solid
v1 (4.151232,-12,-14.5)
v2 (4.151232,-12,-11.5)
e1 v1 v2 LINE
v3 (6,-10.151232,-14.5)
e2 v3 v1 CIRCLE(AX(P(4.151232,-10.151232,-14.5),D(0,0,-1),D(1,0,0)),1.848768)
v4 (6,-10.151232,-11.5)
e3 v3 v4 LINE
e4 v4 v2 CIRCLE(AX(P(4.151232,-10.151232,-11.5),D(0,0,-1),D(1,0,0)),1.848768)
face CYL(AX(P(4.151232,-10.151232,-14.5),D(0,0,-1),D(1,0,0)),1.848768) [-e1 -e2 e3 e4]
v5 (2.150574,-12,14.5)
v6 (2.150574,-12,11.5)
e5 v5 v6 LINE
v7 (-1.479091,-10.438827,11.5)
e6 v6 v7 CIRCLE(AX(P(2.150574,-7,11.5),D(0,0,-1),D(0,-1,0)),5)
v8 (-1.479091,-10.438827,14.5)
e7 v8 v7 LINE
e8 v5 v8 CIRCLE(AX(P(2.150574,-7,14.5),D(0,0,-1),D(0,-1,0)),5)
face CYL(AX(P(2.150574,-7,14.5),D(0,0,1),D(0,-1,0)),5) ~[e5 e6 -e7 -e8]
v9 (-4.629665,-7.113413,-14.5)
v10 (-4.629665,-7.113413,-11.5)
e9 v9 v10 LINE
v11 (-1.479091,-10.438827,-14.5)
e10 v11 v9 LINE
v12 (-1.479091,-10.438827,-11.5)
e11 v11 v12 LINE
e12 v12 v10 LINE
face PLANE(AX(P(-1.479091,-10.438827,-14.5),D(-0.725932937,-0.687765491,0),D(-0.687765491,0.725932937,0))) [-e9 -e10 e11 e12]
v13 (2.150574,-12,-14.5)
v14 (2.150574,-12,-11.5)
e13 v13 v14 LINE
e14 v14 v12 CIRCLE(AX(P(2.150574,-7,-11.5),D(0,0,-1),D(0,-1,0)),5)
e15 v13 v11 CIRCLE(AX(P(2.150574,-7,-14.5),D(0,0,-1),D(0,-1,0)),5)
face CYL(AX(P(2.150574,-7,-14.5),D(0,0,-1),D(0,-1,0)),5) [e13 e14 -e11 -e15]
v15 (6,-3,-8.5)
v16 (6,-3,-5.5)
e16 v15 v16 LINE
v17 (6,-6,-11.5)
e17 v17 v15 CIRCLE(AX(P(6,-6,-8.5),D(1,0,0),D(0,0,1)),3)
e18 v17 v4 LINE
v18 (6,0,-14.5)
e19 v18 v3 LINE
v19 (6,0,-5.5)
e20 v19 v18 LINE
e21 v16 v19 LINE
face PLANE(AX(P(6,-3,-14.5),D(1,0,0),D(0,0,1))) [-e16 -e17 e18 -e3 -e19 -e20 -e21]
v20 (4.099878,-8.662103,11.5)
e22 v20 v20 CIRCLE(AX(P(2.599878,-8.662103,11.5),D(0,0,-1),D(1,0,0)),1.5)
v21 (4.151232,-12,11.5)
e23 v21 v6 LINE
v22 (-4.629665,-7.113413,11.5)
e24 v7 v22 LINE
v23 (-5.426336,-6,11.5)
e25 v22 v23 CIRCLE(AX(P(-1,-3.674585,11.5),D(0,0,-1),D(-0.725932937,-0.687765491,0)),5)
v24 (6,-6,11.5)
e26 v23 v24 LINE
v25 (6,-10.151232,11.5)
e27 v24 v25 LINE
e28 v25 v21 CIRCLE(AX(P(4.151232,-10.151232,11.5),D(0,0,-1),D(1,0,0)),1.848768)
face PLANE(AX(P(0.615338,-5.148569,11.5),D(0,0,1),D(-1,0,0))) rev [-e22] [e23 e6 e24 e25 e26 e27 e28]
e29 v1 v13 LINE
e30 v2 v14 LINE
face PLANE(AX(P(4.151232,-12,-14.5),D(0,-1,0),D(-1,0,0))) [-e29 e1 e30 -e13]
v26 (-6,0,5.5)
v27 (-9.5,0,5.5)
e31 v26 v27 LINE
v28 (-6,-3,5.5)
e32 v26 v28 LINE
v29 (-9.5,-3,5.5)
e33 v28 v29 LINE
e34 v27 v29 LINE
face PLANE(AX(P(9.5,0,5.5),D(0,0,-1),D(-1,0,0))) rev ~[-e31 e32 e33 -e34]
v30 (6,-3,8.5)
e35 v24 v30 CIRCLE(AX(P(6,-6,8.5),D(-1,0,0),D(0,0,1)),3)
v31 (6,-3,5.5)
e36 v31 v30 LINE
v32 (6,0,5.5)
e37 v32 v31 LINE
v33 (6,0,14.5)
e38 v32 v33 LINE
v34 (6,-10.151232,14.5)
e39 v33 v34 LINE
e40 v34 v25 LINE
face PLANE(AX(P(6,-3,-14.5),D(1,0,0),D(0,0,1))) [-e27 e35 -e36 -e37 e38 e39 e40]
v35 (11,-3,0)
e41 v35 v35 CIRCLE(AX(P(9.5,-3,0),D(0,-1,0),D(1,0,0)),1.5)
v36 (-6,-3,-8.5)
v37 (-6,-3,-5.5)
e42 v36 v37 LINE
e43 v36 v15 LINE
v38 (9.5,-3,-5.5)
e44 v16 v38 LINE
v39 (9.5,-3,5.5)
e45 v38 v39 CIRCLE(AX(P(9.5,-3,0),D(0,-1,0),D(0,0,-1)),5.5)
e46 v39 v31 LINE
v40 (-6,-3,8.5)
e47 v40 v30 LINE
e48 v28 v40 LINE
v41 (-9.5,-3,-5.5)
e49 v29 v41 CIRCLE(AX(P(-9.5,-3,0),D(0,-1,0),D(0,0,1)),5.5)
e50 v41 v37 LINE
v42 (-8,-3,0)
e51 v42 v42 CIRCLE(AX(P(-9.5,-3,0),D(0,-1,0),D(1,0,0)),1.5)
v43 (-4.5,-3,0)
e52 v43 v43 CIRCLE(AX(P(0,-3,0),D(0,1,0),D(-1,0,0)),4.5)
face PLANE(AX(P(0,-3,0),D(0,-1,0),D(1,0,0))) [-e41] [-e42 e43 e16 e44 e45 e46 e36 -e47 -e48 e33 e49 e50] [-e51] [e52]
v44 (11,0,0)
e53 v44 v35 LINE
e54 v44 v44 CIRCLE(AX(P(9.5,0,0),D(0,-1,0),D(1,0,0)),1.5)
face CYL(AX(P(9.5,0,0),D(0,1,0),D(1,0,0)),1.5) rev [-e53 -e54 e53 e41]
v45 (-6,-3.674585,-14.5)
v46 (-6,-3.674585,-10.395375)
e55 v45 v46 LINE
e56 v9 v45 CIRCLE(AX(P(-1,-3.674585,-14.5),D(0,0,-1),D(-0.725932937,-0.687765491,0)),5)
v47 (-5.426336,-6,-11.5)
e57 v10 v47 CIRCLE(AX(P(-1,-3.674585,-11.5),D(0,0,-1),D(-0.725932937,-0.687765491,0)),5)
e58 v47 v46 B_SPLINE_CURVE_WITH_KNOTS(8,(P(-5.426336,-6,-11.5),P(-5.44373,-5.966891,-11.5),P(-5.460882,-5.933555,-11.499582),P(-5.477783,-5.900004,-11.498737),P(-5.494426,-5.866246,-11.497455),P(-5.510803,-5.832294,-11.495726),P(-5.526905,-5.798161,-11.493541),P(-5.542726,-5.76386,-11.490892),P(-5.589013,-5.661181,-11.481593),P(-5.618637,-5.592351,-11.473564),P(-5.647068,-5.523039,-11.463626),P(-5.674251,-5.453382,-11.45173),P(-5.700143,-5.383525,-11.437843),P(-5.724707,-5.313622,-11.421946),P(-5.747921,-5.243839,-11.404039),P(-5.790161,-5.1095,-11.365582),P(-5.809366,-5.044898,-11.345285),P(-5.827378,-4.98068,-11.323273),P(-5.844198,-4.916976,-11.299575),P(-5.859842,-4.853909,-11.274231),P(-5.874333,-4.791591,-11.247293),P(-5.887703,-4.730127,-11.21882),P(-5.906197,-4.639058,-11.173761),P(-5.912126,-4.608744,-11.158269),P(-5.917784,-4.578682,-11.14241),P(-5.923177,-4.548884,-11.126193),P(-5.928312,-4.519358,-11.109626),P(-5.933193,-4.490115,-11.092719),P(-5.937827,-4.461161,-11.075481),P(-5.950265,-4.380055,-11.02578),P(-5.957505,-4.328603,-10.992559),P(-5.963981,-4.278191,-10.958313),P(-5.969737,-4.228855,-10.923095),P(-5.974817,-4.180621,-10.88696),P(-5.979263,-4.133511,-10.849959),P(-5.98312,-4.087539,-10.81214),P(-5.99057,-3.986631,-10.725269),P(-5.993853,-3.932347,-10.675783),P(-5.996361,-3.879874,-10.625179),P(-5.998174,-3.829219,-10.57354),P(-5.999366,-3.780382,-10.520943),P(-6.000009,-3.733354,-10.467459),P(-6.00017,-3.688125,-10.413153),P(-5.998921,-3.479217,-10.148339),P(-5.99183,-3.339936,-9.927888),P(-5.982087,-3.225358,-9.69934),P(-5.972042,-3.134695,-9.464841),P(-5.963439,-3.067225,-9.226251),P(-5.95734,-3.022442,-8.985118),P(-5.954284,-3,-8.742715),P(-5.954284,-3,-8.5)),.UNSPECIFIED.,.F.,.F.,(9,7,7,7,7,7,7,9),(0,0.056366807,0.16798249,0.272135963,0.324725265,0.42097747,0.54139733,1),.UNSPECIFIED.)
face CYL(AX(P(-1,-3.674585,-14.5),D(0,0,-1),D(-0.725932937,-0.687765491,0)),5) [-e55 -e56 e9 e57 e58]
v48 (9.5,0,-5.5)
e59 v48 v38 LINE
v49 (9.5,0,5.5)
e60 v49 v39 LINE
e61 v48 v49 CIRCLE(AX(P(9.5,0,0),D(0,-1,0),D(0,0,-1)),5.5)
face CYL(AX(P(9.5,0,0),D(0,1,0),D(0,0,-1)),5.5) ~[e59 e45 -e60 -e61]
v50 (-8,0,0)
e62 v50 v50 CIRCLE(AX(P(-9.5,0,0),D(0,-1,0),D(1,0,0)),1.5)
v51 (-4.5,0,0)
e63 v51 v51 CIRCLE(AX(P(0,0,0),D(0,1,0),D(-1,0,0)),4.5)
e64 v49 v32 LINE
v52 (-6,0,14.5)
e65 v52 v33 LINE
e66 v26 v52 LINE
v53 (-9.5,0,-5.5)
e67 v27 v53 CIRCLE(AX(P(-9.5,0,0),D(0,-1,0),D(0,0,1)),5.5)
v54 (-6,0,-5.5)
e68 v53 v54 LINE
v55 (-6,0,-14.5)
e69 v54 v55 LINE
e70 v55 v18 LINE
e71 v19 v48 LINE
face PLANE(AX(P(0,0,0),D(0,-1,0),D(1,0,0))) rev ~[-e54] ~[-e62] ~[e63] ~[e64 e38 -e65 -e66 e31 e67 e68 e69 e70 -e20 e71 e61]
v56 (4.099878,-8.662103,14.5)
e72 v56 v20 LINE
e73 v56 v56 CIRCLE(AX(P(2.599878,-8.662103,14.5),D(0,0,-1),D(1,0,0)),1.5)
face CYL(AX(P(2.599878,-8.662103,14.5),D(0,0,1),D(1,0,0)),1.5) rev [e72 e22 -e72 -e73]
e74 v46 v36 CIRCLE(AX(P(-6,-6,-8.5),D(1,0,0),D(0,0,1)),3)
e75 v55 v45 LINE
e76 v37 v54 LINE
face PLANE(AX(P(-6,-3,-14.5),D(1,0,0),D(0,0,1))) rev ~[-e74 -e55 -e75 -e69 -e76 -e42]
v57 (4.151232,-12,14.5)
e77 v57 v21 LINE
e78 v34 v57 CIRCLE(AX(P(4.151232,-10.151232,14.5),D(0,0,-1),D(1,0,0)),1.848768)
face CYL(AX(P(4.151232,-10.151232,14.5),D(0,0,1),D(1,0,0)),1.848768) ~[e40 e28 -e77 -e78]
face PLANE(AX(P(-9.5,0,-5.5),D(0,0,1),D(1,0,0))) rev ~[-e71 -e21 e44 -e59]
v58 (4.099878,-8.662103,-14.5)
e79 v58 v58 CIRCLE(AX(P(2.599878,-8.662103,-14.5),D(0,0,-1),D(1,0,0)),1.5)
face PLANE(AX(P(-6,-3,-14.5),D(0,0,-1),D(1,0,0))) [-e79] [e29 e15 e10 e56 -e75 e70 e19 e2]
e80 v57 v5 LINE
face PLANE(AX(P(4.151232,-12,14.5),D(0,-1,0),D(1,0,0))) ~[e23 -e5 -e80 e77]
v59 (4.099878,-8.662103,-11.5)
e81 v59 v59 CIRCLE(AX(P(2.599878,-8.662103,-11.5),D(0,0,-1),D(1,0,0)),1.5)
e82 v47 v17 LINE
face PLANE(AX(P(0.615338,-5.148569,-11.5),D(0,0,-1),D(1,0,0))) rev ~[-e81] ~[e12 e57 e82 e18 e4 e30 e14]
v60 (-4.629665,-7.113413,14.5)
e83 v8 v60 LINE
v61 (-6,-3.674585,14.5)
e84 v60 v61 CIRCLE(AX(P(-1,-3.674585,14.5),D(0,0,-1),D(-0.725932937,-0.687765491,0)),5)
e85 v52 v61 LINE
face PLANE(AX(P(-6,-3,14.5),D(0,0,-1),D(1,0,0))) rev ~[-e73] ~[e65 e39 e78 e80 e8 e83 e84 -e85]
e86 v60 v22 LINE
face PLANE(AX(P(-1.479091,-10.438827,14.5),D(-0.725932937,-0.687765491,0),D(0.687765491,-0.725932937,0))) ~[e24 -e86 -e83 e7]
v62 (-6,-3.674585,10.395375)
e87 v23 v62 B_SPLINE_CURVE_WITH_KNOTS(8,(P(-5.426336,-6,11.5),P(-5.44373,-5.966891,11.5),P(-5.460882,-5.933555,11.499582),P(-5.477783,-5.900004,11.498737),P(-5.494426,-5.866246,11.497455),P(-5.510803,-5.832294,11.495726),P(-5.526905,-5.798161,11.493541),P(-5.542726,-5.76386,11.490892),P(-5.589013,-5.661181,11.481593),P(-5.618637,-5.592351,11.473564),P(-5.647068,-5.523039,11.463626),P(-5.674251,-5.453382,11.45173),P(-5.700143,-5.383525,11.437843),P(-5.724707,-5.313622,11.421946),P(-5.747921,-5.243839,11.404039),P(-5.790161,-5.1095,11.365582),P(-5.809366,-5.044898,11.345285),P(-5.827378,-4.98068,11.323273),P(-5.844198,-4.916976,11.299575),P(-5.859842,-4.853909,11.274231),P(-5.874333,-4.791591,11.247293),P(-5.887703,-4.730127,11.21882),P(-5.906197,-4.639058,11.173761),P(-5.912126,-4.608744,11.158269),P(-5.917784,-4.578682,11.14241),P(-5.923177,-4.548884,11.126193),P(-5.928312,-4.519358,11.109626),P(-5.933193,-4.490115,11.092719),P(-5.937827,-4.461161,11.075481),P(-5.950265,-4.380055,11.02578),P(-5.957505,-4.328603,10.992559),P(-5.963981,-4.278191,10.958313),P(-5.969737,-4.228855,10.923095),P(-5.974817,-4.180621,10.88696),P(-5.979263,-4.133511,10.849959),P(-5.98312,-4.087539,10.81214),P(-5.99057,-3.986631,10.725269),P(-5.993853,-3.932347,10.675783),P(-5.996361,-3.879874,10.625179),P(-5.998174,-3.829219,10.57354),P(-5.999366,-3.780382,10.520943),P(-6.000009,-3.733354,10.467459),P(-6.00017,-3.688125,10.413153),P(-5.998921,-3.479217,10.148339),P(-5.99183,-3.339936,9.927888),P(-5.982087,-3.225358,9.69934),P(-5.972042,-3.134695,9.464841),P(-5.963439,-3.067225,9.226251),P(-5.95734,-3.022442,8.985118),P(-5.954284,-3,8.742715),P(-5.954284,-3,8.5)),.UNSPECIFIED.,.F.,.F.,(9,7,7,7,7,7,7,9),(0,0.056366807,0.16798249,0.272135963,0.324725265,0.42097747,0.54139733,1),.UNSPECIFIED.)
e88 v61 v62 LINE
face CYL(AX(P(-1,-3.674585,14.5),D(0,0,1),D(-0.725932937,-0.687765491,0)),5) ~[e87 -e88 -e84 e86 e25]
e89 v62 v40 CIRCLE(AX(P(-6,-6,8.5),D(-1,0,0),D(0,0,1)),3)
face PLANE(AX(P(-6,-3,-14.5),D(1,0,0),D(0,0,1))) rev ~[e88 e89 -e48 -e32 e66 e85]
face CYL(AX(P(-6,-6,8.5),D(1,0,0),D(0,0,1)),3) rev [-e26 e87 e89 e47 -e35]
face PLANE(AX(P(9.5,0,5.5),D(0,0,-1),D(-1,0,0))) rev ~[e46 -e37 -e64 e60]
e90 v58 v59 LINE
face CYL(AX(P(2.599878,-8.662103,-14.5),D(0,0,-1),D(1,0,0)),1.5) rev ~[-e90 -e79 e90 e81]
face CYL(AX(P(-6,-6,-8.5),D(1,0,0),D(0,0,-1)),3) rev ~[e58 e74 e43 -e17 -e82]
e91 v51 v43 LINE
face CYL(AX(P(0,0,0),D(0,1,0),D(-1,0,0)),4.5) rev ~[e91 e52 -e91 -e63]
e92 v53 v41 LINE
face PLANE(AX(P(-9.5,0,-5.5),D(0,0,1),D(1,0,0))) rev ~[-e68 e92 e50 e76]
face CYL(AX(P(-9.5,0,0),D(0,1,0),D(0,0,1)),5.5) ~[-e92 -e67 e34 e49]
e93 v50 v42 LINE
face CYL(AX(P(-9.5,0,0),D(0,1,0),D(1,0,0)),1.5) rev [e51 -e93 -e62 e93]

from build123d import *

# Parameters (mm, degrees)
F0_R     = 1.5
F0_R_2   = 4.5
F1_DEPTH = 3
F2_W     = 12
F2_H     = 29
F3_DEPTH = 3
F4_R     = 1.5
F5_DEPTH = 3
F7_R     = 3
F8_R     = 4.5
F9_DEPTH = 3


with BuildPart() as f1:
    # F0 (on Front) → F1 (new body)
    with BuildSketch(Plane.XZ):
        with BuildLine():
            Line((0, -5.5), (9.5, -5.5))
            ThreePointArc((9.5, -5.5), (15, 0), (9.5, 5.5))
            Line((9.5, 5.5), (0, 5.5))
            Line((0, 5.5), (-9.5, 5.5))
            ThreePointArc((-9.5, 5.5), (-15, 0), (-9.5, -5.5))
            Line((-9.5, -5.5), (0, -5.5))
        make_face()
        with Locations((-9.5, 0)):
            Circle(F0_R, mode=Mode.SUBTRACT)
        Circle(F0_R_2, mode=Mode.SUBTRACT)
        with Locations((9.5, 0)):
            Circle(F0_R, mode=Mode.SUBTRACT)
    extrude(amount=F1_DEPTH)

    # F2 (on face) → F3 (join)
    with BuildSketch(Plane.XZ.offset(3)):
        Rectangle(F2_W, F2_H)
    extrude(amount=-F3_DEPTH)

    # F4 (on face) → F5 (join)
    with BuildSketch(Plane(origin=(0, 0, -14.5), x_dir=(1, 0, 0), z_dir=(0, 0, -1))):
        with BuildLine():
            Line((-6, 0), (6, 0))
            Line((6, 0), (6, 10.1512318682))
            ThreePointArc((6, 10.1512318682), (5.458508351, 11.458508351), (4.1512318682, 12))
            Line((4.1512318682, 12), (2.1505740618, 12))
            ThreePointArc((2.1505740618, 12), (0.1749902584, 11.5931545408), (-1.4790906252, 10.4388274542))
            Line((-1.4790906252, 10.4388274542), (-4.629664687, 7.11341274))
            ThreePointArc((-4.629664687, 7.11341274), (-5.6447994271, 5.5254873044), (-6, 3.6745852858))
            Line((-6, 3.6745852858), (-6, 0))
        make_face()
        with Locations((2.5998784695, 8.662102744)):
            Circle(F4_R, mode=Mode.SUBTRACT)
    extrude(amount=-F5_DEPTH)

    # F6: F1 across plane


with BuildPart() as f1_1:
    add(f1.part)
    add(f1.part.mirror(Plane.XY))

    # F7
    f7_edges = [f1_1.edges().sort_by_distance(p)[0] for p in [
        (0, -3, 11.5),
        (0, -3, -11.5),
    ]]
    fillet(f7_edges, radius=F7_R)

    # F8 (on face) → F9 (cut, through all)
    with BuildSketch(Plane(origin=(0, 0, 0), x_dir=(-1, 0, 0), z_dir=(0, 1, 0))):
        Circle(F8_R)
    extrude(amount=-F9_DEPTH, mode=Mode.SUBTRACT)


solid = f1_1.part
